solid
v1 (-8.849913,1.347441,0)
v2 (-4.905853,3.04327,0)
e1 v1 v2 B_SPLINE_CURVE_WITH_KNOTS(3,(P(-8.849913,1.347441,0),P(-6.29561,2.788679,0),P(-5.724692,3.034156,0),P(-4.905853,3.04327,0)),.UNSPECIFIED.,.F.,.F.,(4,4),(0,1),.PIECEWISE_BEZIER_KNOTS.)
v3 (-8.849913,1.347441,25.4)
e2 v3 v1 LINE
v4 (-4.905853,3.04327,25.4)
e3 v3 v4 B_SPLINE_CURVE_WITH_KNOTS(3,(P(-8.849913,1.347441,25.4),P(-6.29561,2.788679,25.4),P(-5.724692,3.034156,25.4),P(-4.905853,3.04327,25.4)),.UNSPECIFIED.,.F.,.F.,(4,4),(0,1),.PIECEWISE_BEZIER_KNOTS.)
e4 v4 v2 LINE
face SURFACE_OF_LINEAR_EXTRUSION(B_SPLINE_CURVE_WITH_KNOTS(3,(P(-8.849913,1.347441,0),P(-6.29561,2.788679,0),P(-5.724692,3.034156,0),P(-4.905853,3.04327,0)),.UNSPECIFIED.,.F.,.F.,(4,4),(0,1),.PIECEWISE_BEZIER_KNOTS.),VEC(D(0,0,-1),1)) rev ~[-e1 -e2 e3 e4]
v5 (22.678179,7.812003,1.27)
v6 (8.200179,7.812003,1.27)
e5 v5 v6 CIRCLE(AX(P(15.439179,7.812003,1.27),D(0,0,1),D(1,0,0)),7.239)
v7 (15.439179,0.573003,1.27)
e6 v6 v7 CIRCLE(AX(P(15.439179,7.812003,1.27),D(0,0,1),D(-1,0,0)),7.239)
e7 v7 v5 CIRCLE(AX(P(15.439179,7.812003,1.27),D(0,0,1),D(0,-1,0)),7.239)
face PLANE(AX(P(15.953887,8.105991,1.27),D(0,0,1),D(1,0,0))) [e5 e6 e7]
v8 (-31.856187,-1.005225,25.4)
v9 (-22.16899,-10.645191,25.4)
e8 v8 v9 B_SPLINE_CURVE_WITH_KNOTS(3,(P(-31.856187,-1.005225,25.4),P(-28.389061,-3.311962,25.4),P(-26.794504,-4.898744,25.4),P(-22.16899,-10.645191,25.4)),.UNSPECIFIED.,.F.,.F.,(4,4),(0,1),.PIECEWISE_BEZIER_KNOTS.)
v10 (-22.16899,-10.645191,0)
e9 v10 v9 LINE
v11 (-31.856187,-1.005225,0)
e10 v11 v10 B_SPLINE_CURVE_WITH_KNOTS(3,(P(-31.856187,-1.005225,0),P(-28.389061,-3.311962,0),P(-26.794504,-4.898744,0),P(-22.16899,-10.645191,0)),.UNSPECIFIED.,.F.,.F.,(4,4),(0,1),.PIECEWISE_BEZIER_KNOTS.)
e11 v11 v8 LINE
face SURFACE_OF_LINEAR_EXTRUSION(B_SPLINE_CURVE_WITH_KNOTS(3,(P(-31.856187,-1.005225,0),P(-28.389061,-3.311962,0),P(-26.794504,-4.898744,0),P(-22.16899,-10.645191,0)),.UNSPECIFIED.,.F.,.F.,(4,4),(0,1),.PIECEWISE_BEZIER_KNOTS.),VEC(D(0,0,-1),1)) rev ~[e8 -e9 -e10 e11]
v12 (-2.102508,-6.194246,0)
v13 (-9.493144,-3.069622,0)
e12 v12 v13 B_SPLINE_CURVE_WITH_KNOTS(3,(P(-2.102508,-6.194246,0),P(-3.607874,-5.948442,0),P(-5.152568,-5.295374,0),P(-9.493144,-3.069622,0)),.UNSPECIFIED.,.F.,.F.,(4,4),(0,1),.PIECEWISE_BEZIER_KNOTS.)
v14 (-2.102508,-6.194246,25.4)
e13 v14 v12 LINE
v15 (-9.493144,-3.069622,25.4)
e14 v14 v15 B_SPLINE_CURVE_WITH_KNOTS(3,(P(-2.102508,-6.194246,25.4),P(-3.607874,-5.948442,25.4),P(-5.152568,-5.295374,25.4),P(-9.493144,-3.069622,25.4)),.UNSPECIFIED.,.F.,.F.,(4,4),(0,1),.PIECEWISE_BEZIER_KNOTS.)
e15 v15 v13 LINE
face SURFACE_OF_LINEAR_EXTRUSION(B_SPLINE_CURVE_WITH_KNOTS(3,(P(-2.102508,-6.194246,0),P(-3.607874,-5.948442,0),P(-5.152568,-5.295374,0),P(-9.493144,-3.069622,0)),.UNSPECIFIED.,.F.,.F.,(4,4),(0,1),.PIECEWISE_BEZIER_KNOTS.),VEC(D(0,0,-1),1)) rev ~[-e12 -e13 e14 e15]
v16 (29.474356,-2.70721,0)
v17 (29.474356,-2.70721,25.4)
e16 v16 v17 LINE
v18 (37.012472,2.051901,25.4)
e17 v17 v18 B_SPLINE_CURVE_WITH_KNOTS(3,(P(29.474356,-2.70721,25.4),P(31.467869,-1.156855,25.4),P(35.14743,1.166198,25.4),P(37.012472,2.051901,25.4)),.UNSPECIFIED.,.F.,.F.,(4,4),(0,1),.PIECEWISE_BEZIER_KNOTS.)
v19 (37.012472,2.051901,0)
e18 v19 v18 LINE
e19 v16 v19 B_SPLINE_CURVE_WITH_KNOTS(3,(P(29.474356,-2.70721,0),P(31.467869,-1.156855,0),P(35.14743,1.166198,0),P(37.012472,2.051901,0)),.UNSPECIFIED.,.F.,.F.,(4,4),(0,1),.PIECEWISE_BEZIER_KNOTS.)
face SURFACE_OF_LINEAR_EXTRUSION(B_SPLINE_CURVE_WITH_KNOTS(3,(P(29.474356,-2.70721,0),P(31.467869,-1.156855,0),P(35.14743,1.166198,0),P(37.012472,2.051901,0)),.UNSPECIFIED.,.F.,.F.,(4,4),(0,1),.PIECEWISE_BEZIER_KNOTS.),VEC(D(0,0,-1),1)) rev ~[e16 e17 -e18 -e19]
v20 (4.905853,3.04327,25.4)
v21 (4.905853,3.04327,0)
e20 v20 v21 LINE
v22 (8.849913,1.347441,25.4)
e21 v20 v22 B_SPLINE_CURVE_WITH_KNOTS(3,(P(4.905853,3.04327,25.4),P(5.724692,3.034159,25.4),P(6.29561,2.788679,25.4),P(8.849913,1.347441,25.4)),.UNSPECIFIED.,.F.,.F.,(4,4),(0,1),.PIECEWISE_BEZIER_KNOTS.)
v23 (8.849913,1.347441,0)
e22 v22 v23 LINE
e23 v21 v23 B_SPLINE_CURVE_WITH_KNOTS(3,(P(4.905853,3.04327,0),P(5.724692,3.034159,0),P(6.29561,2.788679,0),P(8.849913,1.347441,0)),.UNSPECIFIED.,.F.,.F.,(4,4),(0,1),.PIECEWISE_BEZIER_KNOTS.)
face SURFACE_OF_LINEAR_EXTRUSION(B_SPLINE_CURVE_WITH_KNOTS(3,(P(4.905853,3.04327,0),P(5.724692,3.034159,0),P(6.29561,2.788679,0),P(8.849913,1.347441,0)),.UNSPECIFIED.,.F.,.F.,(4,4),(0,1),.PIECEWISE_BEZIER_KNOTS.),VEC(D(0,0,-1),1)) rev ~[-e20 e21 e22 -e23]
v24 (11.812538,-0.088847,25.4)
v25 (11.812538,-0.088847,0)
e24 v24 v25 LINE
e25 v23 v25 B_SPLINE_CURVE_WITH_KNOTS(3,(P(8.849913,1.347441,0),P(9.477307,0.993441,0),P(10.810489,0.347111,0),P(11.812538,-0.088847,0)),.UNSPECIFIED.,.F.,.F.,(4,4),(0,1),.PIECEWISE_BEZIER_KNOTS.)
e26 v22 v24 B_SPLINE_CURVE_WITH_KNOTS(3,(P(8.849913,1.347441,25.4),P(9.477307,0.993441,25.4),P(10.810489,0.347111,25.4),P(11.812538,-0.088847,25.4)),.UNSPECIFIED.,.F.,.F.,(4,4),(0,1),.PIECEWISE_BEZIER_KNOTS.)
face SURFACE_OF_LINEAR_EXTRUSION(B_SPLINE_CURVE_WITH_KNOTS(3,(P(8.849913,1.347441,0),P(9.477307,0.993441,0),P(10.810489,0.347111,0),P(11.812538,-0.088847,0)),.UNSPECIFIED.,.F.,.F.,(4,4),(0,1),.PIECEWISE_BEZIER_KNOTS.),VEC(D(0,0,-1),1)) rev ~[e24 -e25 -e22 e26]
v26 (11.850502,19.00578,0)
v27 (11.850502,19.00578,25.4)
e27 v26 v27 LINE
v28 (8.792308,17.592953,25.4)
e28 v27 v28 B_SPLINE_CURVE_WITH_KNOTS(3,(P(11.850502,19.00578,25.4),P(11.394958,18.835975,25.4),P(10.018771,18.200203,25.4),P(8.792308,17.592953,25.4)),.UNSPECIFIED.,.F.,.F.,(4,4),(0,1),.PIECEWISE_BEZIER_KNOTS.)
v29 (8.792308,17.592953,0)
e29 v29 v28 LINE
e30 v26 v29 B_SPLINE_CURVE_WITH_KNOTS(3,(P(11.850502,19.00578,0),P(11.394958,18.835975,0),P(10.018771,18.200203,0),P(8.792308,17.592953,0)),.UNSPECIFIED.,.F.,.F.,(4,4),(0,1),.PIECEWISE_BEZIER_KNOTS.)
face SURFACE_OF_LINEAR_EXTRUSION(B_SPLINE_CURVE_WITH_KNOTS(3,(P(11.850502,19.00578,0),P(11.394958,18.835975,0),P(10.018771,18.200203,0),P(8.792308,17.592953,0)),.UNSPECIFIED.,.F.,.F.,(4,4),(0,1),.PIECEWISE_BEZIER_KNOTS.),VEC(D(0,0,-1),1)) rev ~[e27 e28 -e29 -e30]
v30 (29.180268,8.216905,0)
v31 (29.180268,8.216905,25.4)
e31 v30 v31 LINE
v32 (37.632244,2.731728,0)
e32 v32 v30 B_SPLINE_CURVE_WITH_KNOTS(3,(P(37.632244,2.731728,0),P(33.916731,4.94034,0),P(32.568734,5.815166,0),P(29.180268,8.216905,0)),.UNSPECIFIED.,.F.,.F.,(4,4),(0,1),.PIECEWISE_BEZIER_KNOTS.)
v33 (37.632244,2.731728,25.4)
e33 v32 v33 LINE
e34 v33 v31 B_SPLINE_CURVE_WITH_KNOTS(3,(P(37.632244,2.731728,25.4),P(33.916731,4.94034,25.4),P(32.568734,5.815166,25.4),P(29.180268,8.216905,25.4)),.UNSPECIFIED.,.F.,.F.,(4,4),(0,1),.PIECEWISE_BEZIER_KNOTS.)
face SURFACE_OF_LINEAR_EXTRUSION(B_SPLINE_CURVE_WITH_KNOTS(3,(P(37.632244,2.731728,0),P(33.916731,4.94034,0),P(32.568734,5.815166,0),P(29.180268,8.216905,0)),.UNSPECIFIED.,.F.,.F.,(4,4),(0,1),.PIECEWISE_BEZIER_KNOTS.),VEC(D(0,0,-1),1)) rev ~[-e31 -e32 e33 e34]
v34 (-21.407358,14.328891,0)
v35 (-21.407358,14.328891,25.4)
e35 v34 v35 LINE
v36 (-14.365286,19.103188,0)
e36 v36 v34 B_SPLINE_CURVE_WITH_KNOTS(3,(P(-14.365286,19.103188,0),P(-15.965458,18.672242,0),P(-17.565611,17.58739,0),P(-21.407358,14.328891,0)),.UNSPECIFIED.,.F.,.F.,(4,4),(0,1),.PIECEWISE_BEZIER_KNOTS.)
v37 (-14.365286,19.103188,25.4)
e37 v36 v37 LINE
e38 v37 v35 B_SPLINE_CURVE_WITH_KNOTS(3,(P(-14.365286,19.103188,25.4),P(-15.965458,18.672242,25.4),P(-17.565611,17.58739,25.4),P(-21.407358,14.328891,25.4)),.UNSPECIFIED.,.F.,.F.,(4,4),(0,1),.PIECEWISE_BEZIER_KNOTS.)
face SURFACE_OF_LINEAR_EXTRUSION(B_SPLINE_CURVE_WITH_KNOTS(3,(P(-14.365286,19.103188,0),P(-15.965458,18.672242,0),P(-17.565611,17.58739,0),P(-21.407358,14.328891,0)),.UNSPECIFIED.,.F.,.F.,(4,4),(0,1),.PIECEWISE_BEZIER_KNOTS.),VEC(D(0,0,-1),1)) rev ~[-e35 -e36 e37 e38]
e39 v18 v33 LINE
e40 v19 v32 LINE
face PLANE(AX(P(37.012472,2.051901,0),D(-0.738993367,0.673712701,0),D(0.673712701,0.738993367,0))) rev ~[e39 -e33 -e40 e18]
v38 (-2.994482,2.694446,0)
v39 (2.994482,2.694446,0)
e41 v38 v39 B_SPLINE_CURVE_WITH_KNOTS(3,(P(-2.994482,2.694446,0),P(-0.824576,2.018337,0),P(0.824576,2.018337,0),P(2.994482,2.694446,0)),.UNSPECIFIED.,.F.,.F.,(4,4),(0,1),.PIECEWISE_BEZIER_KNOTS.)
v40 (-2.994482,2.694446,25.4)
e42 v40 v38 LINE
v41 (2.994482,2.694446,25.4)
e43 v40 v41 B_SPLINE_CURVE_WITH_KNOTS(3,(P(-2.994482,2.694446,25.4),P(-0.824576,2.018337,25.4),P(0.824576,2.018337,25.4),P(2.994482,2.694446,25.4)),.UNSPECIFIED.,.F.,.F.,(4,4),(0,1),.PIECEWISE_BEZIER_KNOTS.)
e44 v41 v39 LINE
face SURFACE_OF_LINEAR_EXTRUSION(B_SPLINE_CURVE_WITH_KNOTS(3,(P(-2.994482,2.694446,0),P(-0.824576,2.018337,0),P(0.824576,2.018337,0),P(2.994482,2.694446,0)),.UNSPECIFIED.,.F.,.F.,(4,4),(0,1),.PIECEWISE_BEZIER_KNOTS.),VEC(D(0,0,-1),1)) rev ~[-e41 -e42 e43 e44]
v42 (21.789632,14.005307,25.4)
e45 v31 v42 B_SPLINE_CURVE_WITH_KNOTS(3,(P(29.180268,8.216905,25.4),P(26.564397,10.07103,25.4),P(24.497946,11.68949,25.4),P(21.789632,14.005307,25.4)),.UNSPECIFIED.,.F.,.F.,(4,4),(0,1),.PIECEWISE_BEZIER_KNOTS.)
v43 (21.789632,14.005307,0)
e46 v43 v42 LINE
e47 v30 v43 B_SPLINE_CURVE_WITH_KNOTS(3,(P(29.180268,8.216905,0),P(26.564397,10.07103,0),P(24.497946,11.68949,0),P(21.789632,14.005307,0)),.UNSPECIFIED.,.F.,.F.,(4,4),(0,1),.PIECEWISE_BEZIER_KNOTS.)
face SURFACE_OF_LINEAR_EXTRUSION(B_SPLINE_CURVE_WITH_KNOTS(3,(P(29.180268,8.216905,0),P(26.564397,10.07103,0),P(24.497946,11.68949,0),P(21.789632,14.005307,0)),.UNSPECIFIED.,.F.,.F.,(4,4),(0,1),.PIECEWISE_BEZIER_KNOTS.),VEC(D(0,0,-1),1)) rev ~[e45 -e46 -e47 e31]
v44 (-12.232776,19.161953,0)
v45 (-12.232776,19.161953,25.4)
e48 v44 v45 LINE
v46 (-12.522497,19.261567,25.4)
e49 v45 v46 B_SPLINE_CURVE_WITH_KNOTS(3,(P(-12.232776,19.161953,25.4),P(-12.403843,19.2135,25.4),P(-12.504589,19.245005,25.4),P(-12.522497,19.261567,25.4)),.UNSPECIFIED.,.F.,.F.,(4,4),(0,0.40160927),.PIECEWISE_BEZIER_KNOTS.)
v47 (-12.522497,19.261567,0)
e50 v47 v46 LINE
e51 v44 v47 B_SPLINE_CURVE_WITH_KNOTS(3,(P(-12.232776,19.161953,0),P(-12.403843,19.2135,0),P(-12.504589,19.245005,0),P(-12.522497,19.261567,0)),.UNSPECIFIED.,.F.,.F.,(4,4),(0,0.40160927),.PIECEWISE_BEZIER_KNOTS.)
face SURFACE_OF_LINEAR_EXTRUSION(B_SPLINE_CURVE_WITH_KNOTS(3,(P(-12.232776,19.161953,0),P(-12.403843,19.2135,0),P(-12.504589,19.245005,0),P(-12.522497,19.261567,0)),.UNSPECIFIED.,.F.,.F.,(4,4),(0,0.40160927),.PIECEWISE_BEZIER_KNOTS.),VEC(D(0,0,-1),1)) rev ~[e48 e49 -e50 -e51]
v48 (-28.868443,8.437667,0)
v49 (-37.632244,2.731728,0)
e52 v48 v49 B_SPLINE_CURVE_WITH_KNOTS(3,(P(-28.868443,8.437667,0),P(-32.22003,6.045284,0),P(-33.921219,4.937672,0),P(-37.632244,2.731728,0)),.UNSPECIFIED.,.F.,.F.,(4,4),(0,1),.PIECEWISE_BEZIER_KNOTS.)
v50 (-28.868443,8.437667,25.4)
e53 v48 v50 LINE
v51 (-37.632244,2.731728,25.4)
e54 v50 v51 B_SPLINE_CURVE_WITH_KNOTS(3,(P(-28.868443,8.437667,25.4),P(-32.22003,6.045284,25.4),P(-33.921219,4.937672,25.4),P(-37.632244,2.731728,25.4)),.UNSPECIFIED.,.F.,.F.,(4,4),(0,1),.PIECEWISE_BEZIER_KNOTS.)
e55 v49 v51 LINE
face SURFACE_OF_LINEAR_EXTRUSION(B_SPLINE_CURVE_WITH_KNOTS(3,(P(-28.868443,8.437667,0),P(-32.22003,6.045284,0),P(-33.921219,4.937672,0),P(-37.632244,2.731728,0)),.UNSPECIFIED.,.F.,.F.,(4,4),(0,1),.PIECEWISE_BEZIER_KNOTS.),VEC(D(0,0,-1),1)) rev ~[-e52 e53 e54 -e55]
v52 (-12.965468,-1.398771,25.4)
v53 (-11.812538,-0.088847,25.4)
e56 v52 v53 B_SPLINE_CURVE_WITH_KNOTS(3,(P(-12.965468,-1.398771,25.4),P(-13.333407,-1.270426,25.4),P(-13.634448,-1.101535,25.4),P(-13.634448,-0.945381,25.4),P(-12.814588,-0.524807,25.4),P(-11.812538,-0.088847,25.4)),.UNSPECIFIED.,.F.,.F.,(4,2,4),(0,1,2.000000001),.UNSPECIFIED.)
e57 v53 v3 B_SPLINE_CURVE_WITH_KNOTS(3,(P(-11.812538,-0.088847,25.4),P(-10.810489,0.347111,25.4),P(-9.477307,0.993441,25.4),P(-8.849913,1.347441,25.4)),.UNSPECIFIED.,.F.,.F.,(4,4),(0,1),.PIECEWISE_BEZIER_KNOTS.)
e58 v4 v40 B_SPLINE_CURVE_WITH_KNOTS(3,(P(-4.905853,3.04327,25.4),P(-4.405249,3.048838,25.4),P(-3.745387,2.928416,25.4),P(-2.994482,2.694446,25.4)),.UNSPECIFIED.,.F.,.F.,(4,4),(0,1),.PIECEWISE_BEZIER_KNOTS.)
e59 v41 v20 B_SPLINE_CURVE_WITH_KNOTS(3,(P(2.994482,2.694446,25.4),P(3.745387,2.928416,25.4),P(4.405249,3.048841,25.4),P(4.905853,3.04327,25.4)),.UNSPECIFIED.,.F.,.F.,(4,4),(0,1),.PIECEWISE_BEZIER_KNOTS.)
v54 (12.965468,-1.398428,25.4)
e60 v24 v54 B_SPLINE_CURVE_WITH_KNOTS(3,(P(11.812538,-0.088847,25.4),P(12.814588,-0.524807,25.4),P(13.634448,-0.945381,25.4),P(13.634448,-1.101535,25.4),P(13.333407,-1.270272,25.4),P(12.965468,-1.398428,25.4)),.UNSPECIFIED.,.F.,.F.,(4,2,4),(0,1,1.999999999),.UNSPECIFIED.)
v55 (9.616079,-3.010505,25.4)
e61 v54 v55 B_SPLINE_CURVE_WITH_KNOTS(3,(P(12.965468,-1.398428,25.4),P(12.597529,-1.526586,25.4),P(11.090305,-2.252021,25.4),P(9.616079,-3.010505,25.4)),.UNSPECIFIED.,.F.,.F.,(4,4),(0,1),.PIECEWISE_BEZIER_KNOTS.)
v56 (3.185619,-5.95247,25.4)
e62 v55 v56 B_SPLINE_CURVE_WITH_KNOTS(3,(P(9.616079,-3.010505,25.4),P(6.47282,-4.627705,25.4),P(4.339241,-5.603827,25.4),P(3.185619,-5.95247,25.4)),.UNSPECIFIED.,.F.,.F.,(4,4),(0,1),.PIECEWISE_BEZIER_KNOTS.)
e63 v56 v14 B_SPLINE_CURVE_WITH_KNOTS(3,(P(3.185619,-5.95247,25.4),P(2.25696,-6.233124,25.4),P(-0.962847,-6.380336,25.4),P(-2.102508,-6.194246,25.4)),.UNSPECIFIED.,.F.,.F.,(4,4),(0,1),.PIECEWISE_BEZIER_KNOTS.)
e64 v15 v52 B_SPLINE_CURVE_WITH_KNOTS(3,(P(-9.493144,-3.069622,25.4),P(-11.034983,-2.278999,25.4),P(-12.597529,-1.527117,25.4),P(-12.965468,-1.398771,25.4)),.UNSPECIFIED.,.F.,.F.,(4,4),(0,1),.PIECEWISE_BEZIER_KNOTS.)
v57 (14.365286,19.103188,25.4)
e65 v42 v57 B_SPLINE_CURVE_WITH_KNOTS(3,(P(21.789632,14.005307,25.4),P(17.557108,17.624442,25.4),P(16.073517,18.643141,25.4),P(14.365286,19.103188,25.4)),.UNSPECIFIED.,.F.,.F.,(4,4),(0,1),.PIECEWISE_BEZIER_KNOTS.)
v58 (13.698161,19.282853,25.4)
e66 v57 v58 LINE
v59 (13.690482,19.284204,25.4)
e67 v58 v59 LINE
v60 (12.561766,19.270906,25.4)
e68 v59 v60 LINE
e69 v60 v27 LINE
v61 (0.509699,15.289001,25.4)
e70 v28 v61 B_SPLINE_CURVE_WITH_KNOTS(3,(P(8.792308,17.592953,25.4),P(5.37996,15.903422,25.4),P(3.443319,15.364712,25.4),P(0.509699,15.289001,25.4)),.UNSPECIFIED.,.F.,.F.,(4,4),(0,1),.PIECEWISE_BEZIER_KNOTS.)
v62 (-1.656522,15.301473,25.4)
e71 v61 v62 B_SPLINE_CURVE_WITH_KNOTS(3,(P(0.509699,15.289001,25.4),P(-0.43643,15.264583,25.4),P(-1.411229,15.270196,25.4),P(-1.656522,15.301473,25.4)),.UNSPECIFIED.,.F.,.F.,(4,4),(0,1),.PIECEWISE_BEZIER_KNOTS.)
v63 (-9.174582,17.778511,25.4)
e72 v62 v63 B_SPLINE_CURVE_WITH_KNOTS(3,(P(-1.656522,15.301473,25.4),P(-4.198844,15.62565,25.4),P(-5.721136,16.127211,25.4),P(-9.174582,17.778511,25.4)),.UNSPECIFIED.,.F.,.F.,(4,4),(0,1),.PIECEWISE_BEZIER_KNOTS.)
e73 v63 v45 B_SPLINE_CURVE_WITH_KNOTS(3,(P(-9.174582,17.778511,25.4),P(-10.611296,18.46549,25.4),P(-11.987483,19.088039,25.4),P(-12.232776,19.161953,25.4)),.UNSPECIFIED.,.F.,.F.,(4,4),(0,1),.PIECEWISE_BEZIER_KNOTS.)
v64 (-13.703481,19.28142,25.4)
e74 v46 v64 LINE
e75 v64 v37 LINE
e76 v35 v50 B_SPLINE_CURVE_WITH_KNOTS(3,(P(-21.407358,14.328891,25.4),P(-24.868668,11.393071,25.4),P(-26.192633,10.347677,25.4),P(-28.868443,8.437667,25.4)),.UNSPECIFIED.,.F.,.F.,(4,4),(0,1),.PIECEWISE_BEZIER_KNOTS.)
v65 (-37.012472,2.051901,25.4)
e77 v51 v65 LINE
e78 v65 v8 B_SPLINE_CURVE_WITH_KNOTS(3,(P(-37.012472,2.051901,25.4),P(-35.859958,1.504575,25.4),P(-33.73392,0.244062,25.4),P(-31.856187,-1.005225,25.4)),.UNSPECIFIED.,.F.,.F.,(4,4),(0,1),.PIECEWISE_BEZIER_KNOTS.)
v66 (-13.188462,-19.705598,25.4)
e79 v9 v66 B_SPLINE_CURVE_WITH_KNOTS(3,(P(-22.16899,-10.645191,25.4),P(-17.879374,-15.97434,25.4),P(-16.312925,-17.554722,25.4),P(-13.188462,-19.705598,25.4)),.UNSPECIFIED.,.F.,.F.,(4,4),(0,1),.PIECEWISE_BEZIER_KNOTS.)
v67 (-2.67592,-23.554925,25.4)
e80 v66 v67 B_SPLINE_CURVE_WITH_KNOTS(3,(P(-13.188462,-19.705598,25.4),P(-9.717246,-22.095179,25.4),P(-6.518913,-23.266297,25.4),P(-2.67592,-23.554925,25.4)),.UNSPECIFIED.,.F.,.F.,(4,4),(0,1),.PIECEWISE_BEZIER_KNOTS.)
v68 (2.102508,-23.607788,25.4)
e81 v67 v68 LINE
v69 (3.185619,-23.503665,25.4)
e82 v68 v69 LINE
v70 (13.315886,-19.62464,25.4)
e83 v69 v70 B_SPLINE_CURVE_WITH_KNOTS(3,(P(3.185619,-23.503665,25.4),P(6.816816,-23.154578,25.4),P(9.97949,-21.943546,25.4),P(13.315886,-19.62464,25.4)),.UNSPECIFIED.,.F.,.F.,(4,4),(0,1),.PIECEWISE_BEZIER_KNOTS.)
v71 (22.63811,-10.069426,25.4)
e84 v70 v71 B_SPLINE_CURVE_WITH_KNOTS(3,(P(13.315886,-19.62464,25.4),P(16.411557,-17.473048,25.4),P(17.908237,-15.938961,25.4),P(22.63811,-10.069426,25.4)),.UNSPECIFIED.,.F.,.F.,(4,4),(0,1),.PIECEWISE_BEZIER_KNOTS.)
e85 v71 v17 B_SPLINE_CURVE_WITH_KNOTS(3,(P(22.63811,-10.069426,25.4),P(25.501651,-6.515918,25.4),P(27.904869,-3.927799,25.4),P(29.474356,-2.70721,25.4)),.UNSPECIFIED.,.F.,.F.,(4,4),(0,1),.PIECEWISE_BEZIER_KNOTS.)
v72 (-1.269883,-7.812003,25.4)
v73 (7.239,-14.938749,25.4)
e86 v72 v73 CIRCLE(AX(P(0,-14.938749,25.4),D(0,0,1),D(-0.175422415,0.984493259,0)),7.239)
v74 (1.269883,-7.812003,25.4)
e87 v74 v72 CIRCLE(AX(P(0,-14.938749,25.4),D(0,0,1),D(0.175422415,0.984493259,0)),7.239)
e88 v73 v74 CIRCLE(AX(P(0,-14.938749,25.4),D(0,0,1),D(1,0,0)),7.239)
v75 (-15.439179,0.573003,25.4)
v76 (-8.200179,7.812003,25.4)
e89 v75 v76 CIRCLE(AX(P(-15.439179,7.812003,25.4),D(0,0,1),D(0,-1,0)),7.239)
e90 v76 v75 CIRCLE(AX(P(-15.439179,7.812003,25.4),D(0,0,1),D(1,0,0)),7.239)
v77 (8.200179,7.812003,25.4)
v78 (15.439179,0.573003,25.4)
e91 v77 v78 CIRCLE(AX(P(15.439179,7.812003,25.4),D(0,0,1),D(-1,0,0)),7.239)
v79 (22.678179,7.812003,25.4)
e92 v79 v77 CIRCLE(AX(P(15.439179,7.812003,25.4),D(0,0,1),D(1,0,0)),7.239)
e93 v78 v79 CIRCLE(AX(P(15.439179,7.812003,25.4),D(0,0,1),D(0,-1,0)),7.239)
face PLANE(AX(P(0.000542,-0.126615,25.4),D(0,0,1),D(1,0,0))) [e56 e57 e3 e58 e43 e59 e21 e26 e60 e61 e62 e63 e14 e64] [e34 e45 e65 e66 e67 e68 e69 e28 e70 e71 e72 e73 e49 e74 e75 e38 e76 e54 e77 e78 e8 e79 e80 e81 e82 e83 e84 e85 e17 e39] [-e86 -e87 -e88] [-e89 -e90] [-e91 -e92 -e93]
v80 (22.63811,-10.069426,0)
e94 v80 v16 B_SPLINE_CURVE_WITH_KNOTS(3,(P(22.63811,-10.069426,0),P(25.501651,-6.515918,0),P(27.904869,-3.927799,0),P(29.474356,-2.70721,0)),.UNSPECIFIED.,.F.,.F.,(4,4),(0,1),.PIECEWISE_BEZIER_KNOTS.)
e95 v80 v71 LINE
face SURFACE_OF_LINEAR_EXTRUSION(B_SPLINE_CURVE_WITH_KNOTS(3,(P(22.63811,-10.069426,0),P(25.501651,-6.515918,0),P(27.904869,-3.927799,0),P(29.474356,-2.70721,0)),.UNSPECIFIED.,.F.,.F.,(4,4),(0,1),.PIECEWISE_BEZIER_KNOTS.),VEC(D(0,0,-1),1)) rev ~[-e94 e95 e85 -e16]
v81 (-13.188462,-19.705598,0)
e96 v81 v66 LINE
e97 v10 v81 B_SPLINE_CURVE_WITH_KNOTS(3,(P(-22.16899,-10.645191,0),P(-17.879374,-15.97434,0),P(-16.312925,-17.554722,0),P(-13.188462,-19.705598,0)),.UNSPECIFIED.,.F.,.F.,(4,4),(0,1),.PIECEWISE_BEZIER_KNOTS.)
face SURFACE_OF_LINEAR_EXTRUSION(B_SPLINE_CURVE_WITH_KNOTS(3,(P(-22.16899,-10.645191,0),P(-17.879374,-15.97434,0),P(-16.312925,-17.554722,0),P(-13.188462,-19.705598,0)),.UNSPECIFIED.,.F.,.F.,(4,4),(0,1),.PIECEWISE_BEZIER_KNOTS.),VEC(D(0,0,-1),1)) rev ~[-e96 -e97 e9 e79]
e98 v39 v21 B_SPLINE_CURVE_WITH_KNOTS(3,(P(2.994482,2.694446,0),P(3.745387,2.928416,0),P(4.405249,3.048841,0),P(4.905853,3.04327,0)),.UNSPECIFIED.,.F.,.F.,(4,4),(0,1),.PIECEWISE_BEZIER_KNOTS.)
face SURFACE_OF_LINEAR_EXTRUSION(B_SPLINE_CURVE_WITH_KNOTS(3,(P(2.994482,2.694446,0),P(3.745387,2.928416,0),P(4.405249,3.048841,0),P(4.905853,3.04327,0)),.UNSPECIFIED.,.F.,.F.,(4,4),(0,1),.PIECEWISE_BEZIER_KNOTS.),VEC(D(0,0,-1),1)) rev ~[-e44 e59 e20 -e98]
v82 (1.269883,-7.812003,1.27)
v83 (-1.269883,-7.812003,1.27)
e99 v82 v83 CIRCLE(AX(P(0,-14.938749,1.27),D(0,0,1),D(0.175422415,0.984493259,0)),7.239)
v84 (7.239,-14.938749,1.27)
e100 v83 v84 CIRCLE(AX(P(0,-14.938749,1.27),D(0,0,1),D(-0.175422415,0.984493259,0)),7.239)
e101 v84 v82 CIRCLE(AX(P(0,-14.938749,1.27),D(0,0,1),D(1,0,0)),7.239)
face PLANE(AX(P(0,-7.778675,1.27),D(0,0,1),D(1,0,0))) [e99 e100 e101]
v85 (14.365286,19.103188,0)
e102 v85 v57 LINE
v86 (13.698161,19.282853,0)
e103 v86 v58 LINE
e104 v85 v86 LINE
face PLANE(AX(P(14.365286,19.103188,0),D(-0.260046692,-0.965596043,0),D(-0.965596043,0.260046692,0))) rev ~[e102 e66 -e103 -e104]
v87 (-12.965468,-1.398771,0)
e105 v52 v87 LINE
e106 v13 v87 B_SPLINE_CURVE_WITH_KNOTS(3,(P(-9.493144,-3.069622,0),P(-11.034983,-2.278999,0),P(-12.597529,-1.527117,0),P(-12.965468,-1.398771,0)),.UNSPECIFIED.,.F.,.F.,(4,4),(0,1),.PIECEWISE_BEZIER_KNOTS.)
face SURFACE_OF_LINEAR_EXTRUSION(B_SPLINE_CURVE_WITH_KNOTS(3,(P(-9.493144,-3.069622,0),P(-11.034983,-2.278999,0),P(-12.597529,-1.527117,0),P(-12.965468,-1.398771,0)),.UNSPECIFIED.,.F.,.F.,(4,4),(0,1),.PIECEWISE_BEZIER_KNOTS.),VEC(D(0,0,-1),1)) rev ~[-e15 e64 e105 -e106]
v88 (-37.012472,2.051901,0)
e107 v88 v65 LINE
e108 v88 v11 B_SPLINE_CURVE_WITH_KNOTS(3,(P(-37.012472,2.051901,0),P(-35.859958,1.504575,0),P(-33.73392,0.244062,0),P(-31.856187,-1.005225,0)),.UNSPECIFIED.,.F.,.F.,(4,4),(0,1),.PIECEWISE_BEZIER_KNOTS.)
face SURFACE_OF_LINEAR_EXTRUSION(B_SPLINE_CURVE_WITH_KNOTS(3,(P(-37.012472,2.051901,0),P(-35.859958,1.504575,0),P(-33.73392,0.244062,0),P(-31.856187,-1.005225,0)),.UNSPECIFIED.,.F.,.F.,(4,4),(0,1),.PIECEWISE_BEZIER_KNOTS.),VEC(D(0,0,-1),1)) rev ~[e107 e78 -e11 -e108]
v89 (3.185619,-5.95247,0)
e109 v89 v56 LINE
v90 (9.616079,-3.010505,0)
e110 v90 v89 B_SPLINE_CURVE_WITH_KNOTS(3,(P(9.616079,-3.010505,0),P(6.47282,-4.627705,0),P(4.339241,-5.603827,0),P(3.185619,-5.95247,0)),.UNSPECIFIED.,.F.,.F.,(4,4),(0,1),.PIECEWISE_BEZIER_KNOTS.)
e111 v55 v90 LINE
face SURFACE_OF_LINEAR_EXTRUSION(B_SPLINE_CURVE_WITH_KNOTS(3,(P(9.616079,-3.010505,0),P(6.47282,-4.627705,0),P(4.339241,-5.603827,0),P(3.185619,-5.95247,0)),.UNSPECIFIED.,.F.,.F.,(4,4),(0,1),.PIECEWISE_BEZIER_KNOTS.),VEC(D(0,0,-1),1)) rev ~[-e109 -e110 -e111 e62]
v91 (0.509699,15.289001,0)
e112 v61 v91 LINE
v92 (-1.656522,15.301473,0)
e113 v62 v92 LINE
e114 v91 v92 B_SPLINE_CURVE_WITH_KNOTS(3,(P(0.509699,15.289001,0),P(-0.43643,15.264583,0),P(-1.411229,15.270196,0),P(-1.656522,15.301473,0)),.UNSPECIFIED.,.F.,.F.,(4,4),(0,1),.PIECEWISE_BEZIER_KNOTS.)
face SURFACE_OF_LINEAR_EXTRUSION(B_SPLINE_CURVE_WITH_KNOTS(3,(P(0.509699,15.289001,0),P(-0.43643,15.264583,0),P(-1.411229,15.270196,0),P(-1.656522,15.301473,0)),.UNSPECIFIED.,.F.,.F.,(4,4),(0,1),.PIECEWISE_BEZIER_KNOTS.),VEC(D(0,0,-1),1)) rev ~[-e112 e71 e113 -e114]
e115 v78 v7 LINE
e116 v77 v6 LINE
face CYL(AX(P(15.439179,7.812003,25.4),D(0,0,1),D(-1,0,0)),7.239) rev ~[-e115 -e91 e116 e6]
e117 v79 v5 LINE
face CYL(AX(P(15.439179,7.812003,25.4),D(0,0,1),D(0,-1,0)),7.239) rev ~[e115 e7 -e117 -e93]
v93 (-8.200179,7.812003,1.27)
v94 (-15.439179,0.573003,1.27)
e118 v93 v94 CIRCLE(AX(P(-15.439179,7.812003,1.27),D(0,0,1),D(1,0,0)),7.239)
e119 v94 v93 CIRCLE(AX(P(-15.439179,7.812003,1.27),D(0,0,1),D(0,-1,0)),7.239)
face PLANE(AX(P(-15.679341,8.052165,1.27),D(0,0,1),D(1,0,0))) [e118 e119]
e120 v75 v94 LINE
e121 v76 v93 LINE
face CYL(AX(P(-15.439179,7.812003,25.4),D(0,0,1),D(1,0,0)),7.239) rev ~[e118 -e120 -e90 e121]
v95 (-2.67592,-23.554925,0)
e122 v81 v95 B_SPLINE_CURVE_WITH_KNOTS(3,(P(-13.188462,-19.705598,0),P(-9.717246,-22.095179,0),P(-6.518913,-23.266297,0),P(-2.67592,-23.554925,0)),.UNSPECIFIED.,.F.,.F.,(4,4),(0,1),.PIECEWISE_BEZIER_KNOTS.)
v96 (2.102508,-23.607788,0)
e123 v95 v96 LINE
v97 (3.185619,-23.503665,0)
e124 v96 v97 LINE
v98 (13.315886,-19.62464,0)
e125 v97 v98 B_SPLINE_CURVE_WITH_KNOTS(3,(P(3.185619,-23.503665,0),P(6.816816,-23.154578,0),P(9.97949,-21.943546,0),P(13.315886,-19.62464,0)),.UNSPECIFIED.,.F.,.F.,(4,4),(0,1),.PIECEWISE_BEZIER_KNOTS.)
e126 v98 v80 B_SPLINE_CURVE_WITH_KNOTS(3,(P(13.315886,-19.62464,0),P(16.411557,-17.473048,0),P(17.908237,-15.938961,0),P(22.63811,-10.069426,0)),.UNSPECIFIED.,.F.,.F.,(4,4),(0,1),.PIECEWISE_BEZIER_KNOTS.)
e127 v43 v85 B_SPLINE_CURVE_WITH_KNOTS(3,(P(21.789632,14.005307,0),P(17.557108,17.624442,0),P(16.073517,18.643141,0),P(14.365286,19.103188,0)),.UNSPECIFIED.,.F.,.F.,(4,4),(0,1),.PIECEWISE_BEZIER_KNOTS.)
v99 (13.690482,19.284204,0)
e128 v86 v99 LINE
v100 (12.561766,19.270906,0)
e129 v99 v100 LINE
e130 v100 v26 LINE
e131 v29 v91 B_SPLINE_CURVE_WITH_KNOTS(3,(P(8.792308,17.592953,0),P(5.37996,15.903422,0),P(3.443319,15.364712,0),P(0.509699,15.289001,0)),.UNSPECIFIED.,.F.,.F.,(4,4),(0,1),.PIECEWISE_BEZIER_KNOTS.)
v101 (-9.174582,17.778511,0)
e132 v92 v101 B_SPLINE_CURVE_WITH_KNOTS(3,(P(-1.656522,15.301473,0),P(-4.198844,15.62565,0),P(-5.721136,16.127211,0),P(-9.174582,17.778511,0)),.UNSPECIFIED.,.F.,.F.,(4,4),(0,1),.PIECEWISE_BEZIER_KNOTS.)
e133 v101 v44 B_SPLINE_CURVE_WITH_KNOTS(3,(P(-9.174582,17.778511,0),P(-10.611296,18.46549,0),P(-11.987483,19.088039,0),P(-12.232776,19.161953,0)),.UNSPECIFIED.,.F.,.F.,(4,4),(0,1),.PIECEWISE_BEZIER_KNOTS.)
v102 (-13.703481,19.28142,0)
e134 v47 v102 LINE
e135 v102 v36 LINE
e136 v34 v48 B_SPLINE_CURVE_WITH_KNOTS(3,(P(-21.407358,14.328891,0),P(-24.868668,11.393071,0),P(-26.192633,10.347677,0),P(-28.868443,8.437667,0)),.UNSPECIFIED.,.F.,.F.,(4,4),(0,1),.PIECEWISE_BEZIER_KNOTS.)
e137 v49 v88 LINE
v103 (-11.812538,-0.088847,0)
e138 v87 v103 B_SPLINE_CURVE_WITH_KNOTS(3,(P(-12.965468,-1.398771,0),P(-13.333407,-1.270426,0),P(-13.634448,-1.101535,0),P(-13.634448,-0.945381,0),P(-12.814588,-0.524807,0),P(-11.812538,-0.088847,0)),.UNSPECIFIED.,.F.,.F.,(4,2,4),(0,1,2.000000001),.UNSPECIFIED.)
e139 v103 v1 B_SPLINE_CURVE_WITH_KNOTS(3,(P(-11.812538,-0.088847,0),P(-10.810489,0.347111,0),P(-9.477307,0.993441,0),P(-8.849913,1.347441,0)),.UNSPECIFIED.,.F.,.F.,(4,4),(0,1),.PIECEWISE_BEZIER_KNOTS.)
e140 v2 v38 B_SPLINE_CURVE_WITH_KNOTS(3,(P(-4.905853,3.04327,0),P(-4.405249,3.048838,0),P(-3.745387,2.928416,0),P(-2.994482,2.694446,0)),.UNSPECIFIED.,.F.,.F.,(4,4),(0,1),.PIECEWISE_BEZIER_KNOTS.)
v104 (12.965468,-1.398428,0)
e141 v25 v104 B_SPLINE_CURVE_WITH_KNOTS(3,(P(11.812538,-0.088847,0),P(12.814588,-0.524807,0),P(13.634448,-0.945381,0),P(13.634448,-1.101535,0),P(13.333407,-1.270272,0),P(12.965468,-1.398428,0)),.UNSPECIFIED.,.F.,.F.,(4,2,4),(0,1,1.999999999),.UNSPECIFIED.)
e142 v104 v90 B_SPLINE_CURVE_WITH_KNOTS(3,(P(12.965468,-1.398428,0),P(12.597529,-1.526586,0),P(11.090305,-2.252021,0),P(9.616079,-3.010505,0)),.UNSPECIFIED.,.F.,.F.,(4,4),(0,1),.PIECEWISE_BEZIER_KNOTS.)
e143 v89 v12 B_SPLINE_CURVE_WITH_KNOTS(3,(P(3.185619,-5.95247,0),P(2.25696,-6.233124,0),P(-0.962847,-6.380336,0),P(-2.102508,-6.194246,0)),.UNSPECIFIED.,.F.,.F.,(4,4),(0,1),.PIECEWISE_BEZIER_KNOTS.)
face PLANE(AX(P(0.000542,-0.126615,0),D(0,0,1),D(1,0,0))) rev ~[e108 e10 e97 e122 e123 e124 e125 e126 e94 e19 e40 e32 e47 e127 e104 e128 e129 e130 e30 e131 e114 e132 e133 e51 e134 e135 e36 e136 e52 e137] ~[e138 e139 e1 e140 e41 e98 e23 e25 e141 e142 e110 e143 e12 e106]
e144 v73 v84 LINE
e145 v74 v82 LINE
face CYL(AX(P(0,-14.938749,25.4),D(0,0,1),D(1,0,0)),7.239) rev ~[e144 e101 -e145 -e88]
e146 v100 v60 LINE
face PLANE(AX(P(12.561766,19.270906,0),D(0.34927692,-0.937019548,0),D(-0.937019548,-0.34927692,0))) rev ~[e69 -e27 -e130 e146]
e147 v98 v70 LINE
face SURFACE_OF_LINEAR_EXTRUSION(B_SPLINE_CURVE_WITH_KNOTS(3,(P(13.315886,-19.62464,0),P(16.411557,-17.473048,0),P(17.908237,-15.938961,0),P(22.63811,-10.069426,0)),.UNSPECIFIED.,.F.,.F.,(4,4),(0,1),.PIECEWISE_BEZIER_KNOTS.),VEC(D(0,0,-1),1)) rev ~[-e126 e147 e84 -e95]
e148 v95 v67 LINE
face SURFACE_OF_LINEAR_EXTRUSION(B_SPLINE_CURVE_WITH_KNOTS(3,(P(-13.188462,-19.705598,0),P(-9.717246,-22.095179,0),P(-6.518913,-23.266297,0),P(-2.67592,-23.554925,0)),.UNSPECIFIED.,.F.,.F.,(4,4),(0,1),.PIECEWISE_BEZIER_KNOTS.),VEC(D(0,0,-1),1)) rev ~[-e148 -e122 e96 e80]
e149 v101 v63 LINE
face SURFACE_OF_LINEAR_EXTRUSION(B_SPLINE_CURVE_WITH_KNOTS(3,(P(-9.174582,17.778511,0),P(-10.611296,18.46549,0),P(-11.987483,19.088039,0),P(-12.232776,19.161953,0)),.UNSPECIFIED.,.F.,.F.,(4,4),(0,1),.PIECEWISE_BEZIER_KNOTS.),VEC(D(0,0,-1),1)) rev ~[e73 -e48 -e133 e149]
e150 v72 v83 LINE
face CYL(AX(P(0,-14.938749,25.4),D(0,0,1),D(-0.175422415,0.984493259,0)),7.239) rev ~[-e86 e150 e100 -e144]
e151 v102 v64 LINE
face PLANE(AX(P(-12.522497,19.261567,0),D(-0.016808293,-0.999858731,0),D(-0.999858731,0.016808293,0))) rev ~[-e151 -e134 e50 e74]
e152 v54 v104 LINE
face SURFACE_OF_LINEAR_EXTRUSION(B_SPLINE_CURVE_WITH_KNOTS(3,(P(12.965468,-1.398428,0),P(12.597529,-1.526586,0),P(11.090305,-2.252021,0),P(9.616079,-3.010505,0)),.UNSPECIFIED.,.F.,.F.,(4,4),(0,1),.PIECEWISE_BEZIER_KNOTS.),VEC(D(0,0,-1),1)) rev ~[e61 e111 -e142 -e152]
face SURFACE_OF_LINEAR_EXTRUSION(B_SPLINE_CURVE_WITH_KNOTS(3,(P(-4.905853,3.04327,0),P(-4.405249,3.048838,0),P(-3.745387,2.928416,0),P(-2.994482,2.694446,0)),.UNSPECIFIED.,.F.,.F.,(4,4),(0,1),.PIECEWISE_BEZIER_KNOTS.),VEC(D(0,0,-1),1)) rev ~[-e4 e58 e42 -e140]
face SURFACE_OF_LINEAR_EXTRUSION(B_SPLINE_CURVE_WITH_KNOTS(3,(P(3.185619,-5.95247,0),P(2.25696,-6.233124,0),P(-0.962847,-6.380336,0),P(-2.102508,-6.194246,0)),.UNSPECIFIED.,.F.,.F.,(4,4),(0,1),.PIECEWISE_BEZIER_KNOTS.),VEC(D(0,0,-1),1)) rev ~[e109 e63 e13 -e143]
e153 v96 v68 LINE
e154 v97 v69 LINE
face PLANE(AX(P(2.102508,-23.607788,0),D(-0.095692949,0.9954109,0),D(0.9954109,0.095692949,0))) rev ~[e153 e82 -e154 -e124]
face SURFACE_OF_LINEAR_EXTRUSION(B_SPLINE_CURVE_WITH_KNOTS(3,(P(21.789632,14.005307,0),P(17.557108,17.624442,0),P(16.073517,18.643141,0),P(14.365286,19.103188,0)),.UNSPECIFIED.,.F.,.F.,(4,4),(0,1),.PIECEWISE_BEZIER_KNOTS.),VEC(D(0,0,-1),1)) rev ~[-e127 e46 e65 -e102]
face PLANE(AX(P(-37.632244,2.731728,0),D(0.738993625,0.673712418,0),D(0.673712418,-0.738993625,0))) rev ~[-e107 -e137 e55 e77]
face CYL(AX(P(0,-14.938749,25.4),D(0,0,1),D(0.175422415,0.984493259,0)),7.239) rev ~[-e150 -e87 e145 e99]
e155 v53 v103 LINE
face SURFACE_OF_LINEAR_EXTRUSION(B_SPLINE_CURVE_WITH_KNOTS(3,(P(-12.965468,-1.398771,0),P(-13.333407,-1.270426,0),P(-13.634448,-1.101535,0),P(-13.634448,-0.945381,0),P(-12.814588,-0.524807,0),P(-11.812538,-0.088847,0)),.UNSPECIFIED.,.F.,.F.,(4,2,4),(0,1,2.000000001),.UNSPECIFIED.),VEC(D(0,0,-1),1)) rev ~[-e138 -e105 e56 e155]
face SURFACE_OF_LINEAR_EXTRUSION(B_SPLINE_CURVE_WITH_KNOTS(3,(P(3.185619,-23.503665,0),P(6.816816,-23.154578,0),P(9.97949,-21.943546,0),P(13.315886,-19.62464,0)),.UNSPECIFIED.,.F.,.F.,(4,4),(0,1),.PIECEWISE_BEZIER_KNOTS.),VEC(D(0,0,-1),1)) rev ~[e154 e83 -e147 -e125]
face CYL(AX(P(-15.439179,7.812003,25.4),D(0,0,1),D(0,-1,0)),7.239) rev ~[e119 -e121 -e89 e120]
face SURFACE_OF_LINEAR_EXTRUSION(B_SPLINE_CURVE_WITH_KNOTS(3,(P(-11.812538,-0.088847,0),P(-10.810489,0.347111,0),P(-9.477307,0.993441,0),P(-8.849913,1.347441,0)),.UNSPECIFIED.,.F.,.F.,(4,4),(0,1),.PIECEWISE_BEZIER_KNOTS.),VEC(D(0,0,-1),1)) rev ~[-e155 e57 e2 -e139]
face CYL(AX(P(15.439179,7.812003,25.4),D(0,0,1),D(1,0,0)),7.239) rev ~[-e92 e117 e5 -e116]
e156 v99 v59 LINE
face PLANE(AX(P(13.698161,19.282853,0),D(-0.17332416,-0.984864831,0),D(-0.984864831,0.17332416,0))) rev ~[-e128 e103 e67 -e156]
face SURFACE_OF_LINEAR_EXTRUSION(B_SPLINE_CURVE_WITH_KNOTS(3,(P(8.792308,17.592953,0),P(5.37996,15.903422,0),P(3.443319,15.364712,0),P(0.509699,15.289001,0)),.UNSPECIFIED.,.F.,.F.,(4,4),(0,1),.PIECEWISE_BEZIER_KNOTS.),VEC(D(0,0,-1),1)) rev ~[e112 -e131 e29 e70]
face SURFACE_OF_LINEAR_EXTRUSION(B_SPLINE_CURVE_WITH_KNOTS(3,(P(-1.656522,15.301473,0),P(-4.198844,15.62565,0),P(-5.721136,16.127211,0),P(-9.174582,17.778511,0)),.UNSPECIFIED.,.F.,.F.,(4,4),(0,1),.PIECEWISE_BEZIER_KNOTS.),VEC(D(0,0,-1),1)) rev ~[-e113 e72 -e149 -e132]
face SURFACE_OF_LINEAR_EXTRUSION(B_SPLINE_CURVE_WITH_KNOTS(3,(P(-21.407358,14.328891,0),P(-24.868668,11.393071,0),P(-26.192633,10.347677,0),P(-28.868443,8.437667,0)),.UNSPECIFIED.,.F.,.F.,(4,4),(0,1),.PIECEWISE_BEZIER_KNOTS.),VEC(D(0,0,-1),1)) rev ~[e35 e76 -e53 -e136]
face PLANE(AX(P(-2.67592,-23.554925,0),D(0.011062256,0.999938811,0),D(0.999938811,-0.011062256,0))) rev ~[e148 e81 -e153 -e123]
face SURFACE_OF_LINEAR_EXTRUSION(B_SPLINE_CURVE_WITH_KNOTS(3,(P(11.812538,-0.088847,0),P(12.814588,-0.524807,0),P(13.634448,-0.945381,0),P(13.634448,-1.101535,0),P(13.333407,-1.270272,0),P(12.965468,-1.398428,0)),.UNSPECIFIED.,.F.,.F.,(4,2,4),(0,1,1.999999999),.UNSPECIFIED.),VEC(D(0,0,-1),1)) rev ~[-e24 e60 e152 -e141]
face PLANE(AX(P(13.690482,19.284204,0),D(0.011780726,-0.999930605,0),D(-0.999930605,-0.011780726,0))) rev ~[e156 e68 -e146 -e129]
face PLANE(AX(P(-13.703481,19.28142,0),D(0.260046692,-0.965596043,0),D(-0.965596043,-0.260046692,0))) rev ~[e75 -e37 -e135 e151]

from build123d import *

# Parameters (mm, degrees)
F1_DEPTH = 25.4
F2_R     = 7.239
F3_DEPTH = 24.13


# Not quite as in the source:
# - ends of sketch curves that miss each other by under 0.0002 mm in the source are joined


with BuildPart() as f1:
    # F0 (on Top) → F1 (new body)
    with BuildSketch(Plane.XY):
        with BuildLine():
            add(Edge.make_bspline(
                [(-13.1884615385, -19.7055979293), (-9.7172457191, -22.0951789594), (-6.5189125485, -23.2662965046), (-2.6759197324, -23.5549250296)],
                knots=[0, 0, 0, 0, 1, 1, 1, 1], degree=3))
            Line((-2.6759197324, -23.5549250296), (2.1025083612, -23.6077884611))
            Line((2.1025083612, -23.6077884611), (3.1856187291, -23.5036646015))
            add(Edge.make_bspline(
                [(3.1856187291, -23.5036646015), (6.8168163211, -23.15457813), (9.9794896756, -21.9435460564), (13.3158862876, -19.6246398892)],
                knots=[0, 0, 0, 0, 1, 1, 1, 1], degree=3))
            add(Edge.make_bspline(
                [(13.3158862876, -19.6246398892), (16.4115571605, -17.4730475146), (17.9082372943, -15.9389605714), (22.6381101873, -10.0694262069)],
                knots=[0, 0, 0, 0, 1, 1, 1, 1], degree=3))
            add(Edge.make_bspline(
                [(22.6381101873, -10.0694262069), (25.5016513946, -6.5159182102), (27.9048694214, -3.927799227), (29.4743562341, -2.7072102972)],
                knots=[0, 0, 0, 0, 1, 1, 1, 1], degree=3))
            add(Edge.make_bspline(
                [(29.4743562341, -2.7072102972), (31.4678692876, -1.1568550363), (35.1474296689, 1.1661975322), (37.0124718161, 2.0519014787)],
                knots=[0, 0, 0, 0, 1, 1, 1, 1], degree=3))
            Line((37.0124718161, 2.0519014787), (37.6322441338, 2.7317278065))
            add(Edge.make_bspline(
                [(37.6322441338, 2.7317278065), (33.9167308595, 4.9403402078), (32.5687337458, 5.8151659035), (29.1802675585, 8.2169048474)],
                knots=[0, 0, 0, 0, 1, 1, 1, 1], degree=3))
            add(Edge.make_bspline(
                [(29.1802675585, 8.2169048474), (26.5643967391, 10.0710303571), (24.4979457592, 11.6894900051), (21.789632107, 14.0053073964)],
                knots=[0, 0, 0, 0, 1, 1, 1, 1], degree=3))
            add(Edge.make_bspline(
                [(21.789632107, 14.0053073964), (17.557108204, 17.6244421652), (16.0735171405, 18.6431407559), (14.3652864381, 19.1031879026)],
                knots=[0, 0, 0, 0, 1, 1, 1, 1], degree=3))
            Line((14.3652864381, 19.1031879026), (13.6981605351, 19.2828529762))
            Line((13.6981605351, 19.2828529762), (13.6904819746, 19.2842043089))
            Line((13.6904819746, 19.2842043089), (12.5617656785, 19.2709062892))
            Line((12.5617656785, 19.2709062892), (11.8505016722, 19.0057804423))
            add(Edge.make_bspline(
                [(11.8505016722, 19.0057804423), (11.394958194, 18.8359751773), (10.018770903, 18.2002029302), (8.7923076923, 17.5929531204)],
                knots=[0, 0, 0, 0, 1, 1, 1, 1], degree=3))
            add(Edge.make_bspline(
                [(8.7923076923, 17.5929531204), (5.3799595585, 15.9034224779), (3.4433187191, 15.3647120515), (0.5096989967, 15.2890007254)],
                knots=[0, 0, 0, 0, 1, 1, 1, 1], degree=3))
            add(Edge.make_bspline(
                [(0.5096989967, 15.2890007254), (-0.4364297659, 15.2645829578), (-1.411229097, 15.2701955402), (-1.6565217391, 15.3014730598)],
                knots=[0, 0, 0, 0, 1, 1, 1, 1], degree=3))
            add(Edge.make_bspline(
                [(-1.6565217391, 15.3014730598), (-4.1988442676, 15.625649745), (-5.7211355017, 16.1272113972), (-9.1745819398, 17.7785107923)],
                knots=[0, 0, 0, 0, 1, 1, 1, 1], degree=3))
            add(Edge.make_bspline(
                [(-9.1745819398, 17.7785107923), (-10.6112959866, 18.4654896305), (-11.9874832776, 19.0880385335), (-12.2327759197, 19.1619526928)],
                knots=[0, 0, 0, 0, 1, 1, 1, 1], degree=3))
            add(Edge.make_bspline(
                [(-12.2327759197, 19.1619526928), (-12.4038425542, 19.2135003349), (-12.5045889513, 19.2450051824), (-12.5224971626, 19.2615668616)],
                knots=[0, 0, 0, 0, 0.4016092701, 0.4016092701, 0.4016092701, 0.4016092701], degree=3))
            Line((-12.5224971626, 19.2615668616), (-13.7034814285, 19.2814199953))
            Line((-13.7034814285, 19.2814199953), (-14.3652864381, 19.1031879026))
            add(Edge.make_bspline(
                [(-14.3652864381, 19.1031879026), (-15.9654584047, 18.6722420201), (-17.5656112575, 17.5873902337), (-21.4073578595, 14.3288910786)],
                knots=[0, 0, 0, 0, 1, 1, 1, 1], degree=3))
            add(Edge.make_bspline(
                [(-21.4073578595, 14.3288910786), (-24.8686676789, 11.3930710494), (-26.1926326442, 10.347677133), (-28.8684434285, 8.4376666326)],
                knots=[0, 0, 0, 0, 1, 1, 1, 1], degree=3))
            add(Edge.make_bspline(
                [(-28.8684434285, 8.4376666326), (-32.2200301856, 6.0452835322), (-33.9212185999, 4.9376719336), (-37.6322438152, 2.7317278065)],
                knots=[0, 0, 0, 0, 1, 1, 1, 1], degree=3))
            Line((-37.6322438152, 2.7317278065), (-37.0124719753, 2.0519014787))
            add(Edge.make_bspline(
                [(-37.0124719753, 2.0519014787), (-35.8599579657, 1.5045752279), (-33.7339199875, 0.2440615757), (-31.856187291, -1.0052246818)],
                knots=[0, 0, 0, 0, 1, 1, 1, 1], degree=3))
            add(Edge.make_bspline(
                [(-31.856187291, -1.0052246818), (-28.3890610096, -3.3119617855), (-26.7945040146, -4.8987439594), (-22.168989602, -10.6451911133)],
                knots=[0, 0, 0, 0, 1, 1, 1, 1], degree=3))
            add(Edge.make_bspline(
                [(-22.168989602, -10.6451911133), (-17.8793743144, -15.9743400531), (-16.3129253077, -17.5547216818), (-13.1884615385, -19.7055979293)],
                knots=[0, 0, 0, 0, 1, 1, 1, 1], degree=3))
        make_face()
        with BuildLine():
            add(Edge.make_bspline(
                [(3.1856187291, -5.9524701801), (2.2569598997, -6.2331244644), (-0.9628468896, -6.3803357286), (-2.1025083612, -6.1942458992)],
                knots=[0, 0, 0, 0, 1, 1, 1, 1], degree=3))
            add(Edge.make_bspline(
                [(-2.1025083612, -6.1942458992), (-3.6078737659, -5.9484422838), (-5.1525675452, -5.2953738791), (-9.4931438127, -3.0696215748)],
                knots=[0, 0, 0, 0, 1, 1, 1, 1], degree=3))
            add(Edge.make_bspline(
                [(-9.4931438127, -3.0696215748), (-11.0349832776, -2.2789994276), (-12.5975292642, -1.5271169527), (-12.9654682274, -1.3987709226)],
                knots=[0, 0, 0, 0, 1, 1, 1, 1], degree=3))
            add(Edge.make_bspline(
                [(-12.9654682274, -1.3987709226), (-13.3334071906, -1.2704261668), (-13.6344481605, -1.1015348557), (-13.6344481605, -1.0234578892)],
                knots=[0, 0, 0, 0, 1, 1, 1, 1], degree=3))
            add(Edge.make_bspline(
                [(-13.6344481605, -1.0234578892), (-13.6344481605, -0.9453809226), (-12.8145884047, -0.5248066183), (-11.8125380167, -0.0888470497)],
                knots=[0, 0, 0, 0, 1, 1, 1, 1], degree=3))
            add(Edge.make_bspline(
                [(-11.8125380167, -0.0888470497), (-10.810488903, 0.3471112446), (-9.4773074649, 0.9934414286), (-8.8499125987, 1.3474413985)],
                knots=[0, 0, 0, 0, 1, 1, 1, 1], degree=3))
            add(Edge.make_bspline(
                [(-8.8499125987, 1.3474413985), (-6.2956095953, 2.7886790239), (-5.7246919264, 3.0341564319), (-4.9058528428, 3.04326985)],
                knots=[0, 0, 0, 0, 1, 1, 1, 1], degree=3))
            add(Edge.make_bspline(
                [(-4.9058528428, 3.04326985), (-4.4052494247, 3.0488383115), (-3.7453867324, 2.9284155523), (-2.9944816054, 2.6944458734)],
                knots=[0, 0, 0, 0, 1, 1, 1, 1], degree=3))
            add(Edge.make_bspline(
                [(-2.9944816054, 2.6944458734), (-0.8245757458, 2.0183365255), (0.8245757458, 2.0183365255), (2.9944816054, 2.6944458734)],
                knots=[0, 0, 0, 0, 1, 1, 1, 1], degree=3))
            add(Edge.make_bspline(
                [(2.9944816054, 2.6944458734), (3.7453867324, 2.9284155523), (4.4052494247, 3.04884086), (4.9058528428, 3.04326985)],
                knots=[0, 0, 0, 0, 1, 1, 1, 1], degree=3))
            add(Edge.make_bspline(
                [(4.9058528428, 3.04326985), (5.7246919264, 3.0341589804), (6.2956095953, 2.7886790239), (8.8499125987, 1.3474413985)],
                knots=[0, 0, 0, 0, 1, 1, 1, 1], degree=3))
            add(Edge.make_bspline(
                [(8.8499125987, 1.3474413985), (9.4773074649, 0.9934414286), (10.810488903, 0.3471112446), (11.8125380167, -0.0888470497)],
                knots=[0, 0, 0, 0, 1, 1, 1, 1], degree=3))
            add(Edge.make_bspline(
                [(11.8125380167, -0.0888470497), (12.8145884047, -0.5248066183), (13.6344481605, -0.9453809226), (13.6344481605, -1.0234578892)],
                knots=[0, 0, 0, 0, 1, 1, 1, 1], degree=3))
            add(Edge.make_bspline(
                [(13.6344481605, -1.0234578892), (13.6344481605, -1.1015348557), (13.3334071906, -1.2702719828), (12.9654682274, -1.39842815)],
                knots=[0, 0, 0, 0, 1, 1, 1, 1], degree=3))
            add(Edge.make_bspline(
                [(12.9654682274, -1.39842815), (12.5975292642, -1.5265855915), (11.0903047324, -2.2520210597), (9.616079388, -3.0105054109)],
                knots=[0, 0, 0, 0, 1, 1, 1, 1], degree=3))
            add(Edge.make_bspline(
                [(9.616079388, -3.0105054109), (6.4728204682, -4.6277051467), (4.3392408562, -5.6038271467), (3.1856187291, -5.9524701801)],
                knots=[0, 0, 0, 0, 1, 1, 1, 1], degree=3))
        make_face(mode=Mode.SUBTRACT)
    extrude(amount=F1_DEPTH)

    # F2 (on face) → F3 (cut)
    with BuildSketch(Plane.XY.offset(25.4)):
        with BuildLine():
            Line((-15.4391787946, 0.5730026737), (-15.4391787946, 7.8120026737))
            Line((-15.4391787946, 7.8120026737), (-8.2001787946, 7.8120026737))
            ThreePointArc((-8.2001787946, 7.8120026737), (-20.5579247836, 12.9307486628), (-15.4391787946, 0.5730026737))
        make_face()
        with BuildLine():
            Line((-8.2001787946, 7.8120026737), (-15.4391787946, 7.8120026737))
            Line((-15.4391787946, 7.8120026737), (-15.4391787946, 0.5730026737))
            ThreePointArc((-15.4391787946, 0.5730026737), (-10.3204328056, 2.6932566847), (-8.2001787946, 7.8120026737))
        make_face()
        with BuildLine():
            ThreePointArc((5.2293543768, 16.0678049121), (0.0138821984, 18.3010974633), (-5.2101171545, 16.0878246774))
            add(Edge.make_bspline(
                [(-1.6565217391, 15.3014730598), (-2.9785522156, 15.4700478385), (-4.0247567323, 15.686589164), (-5.2101171545, 16.0878246774)],
                knots=[0, 0, 0, 0, 0.5200089531, 0.5200089531, 0.5200089531, 0.5200089531], degree=3))
            add(Edge.make_bspline(
                [(0.5096989967, 15.2890007254), (-0.4364297659, 15.2645829578), (-1.411229097, 15.2701955402), (-1.6565217391, 15.3014730598)],
                knots=[0, 0, 0, 0, 1, 1, 1, 1], degree=3))
            add(Edge.make_bspline(
                [(5.2293543768, 16.0678049121), (3.6603216323, 15.5449011909), (2.2630856254, 15.3342524074), (0.5096989967, 15.2890007254)],
                knots=[0.4023129122, 0.4023129122, 0.4023129122, 0.4023129122, 1, 1, 1, 1], degree=3))
        make_face()
        with BuildLine():
            add(Edge.make_bspline(
                [(-13.4162854763, -0.8613894905), (-13.1075898138, -0.6826431402), (-12.5033600683, -0.3894012805), (-11.8125380167, -0.0888470497)],
                knots=[0.3105915033, 0.3105915033, 0.3105915033, 0.3105915033, 1, 1, 1, 1], degree=3))
            ThreePointArc((-13.4162854763, -0.8613894905), (-11.8071303692, -1.5501063766), (-10.4103203839, -2.6049205653))
            add(Edge.make_bspline(
                [(-9.4931438127, -3.0696215748), (-9.8012757449, -2.911618141), (-10.1102346708, -2.7551619236), (-10.4103203839, -2.6049205653)],
                knots=[0, 0, 0, 0, 0.1998469615, 0.1998469615, 0.1998469615, 0.1998469615], degree=3))
            add(Edge.make_bspline(
                [(-2.1025083612, -6.1942458992), (-3.6078737659, -5.9484422838), (-5.1525675452, -5.2953738791), (-9.4931438127, -3.0696215748)],
                knots=[0, 0, 0, 0, 1, 1, 1, 1], degree=3))
            add(Edge.make_bspline(
                [(3.1856187291, -5.9524701801), (2.2569598997, -6.2331244644), (-0.9628468896, -6.3803357286), (-2.1025083612, -6.1942458992)],
                knots=[0, 0, 0, 0, 1, 1, 1, 1], degree=3))
            add(Edge.make_bspline(
                [(9.616079388, -3.0105054109), (6.4728204682, -4.6277051467), (4.3392408562, -5.6038271467), (3.1856187291, -5.9524701801)],
                knots=[0, 0, 0, 0, 1, 1, 1, 1], degree=3))
            add(Edge.make_bspline(
                [(10.4068537547, -2.6082707732), (10.1467262743, -2.7391031612), (9.8808705361, -2.8742711894), (9.616079388, -3.0105054109)],
                knots=[0.8203862462, 0.8203862462, 0.8203862462, 0.8203862462, 1, 1, 1, 1], degree=3))
            ThreePointArc((10.4068537547, -2.6082707732), (11.8050454626, -1.5513161359), (13.4162854763, -0.8613894905))
            add(Edge.make_bspline(
                [(11.8125380167, -0.0888470497), (12.5033600683, -0.3894012805), (13.1075898138, -0.6826431402), (13.4162854763, -0.8613894905)],
                knots=[0, 0, 0, 0, 0.6894084967, 0.6894084967, 0.6894084967, 0.6894084967], degree=3))
            add(Edge.make_bspline(
                [(8.8499125987, 1.3474413985), (9.4773074649, 0.9934414286), (10.810488903, 0.3471112446), (11.8125380167, -0.0888470497)],
                knots=[0, 0, 0, 0, 1, 1, 1, 1], degree=3))
            add(Edge.make_bspline(
                [(4.9058528428, 3.04326985), (5.7246919264, 3.0341589804), (6.2956095953, 2.7886790239), (8.8499125987, 1.3474413985)],
                knots=[0, 0, 0, 0, 1, 1, 1, 1], degree=3))
            add(Edge.make_bspline(
                [(2.9944816054, 2.6944458734), (3.7453867324, 2.9284155523), (4.4052494247, 3.04884086), (4.9058528428, 3.04326985)],
                knots=[0, 0, 0, 0, 1, 1, 1, 1], degree=3))
            add(Edge.make_bspline(
                [(-2.9944816054, 2.6944458734), (-0.8245757458, 2.0183365255), (0.8245757458, 2.0183365255), (2.9944816054, 2.6944458734)],
                knots=[0, 0, 0, 0, 1, 1, 1, 1], degree=3))
            add(Edge.make_bspline(
                [(-4.9058528428, 3.04326985), (-4.4052494247, 3.0488383115), (-3.7453867324, 2.9284155523), (-2.9944816054, 2.6944458734)],
                knots=[0, 0, 0, 0, 1, 1, 1, 1], degree=3))
            add(Edge.make_bspline(
                [(-8.8499125987, 1.3474413985), (-6.2956095953, 2.7886790239), (-5.7246919264, 3.0341564319), (-4.9058528428, 3.04326985)],
                knots=[0, 0, 0, 0, 1, 1, 1, 1], degree=3))
            add(Edge.make_bspline(
                [(-11.8125380167, -0.0888470497), (-10.810488903, 0.3471112446), (-9.4773074649, 0.9934414286), (-8.8499125987, 1.3474413985)],
                knots=[0, 0, 0, 0, 1, 1, 1, 1], degree=3))
        make_face()
        with BuildLine():
            ThreePointArc((-10.4103203839, -2.6049205653), (-11.8071303692, -1.5501063766), (-13.4162854763, -0.8613894905))
            add(Edge.make_bspline(
                [(-13.6344481605, -1.0234578892), (-13.6344481605, -0.9992078468), (-13.5553586823, -0.9419180856), (-13.4162854763, -0.8613894905)],
                knots=[0, 0, 0, 0, 0.3105915033, 0.3105915033, 0.3105915033, 0.3105915033], degree=3))
            add(Edge.make_bspline(
                [(-12.9654682274, -1.3987709226), (-13.3334071906, -1.2704261668), (-13.6344481605, -1.1015348557), (-13.6344481605, -1.0234578892)],
                knots=[0, 0, 0, 0, 1, 1, 1, 1], degree=3))
            add(Edge.make_bspline(
                [(-10.4103203839, -2.6049205653), (-11.6118122322, -2.003379874), (-12.671060748, -1.5014673886), (-12.9654682274, -1.3987709226)],
                knots=[0.1998469615, 0.1998469615, 0.1998469615, 0.1998469615, 1, 1, 1, 1], degree=3))
        make_face()
        with BuildLine():
            ThreePointArc((22.6781787946, 7.8120026737), (15.4391787946, 15.0510026737), (8.2001787946, 7.8120026737))
            Line((8.2001787946, 7.8120026737), (15.4391787946, 7.8120026737))
            Line((15.4391787946, 7.8120026737), (15.4391787946, 0.5730026737))
            ThreePointArc((15.4391787946, 0.5730026737), (20.5579247836, 2.6932566847), (22.6781787946, 7.8120026737))
        make_face()
        with BuildLine():
            Line((15.4391787946, 7.8120026737), (8.2001787946, 7.8120026737))
            ThreePointArc((8.2001787946, 7.8120026737), (10.3204328056, 2.6932566847), (15.4391787946, 0.5730026737))
            Line((15.4391787946, 0.5730026737), (15.4391787946, 7.8120026737))
        make_face()
        with BuildLine():
            ThreePointArc((1.2698828628, -7.8120026737), (0, -7.699749373), (-1.2698828628, -7.8120026737))
            Line((-1.2698828628, -7.8120026737), (1.2698828628, -7.8120026737))
        make_face()
        with BuildLine():
            Line((1.2698828628, -7.8120026737), (-1.2698828628, -7.8120026737))
            ThreePointArc((-1.2698828628, -7.8120026737), (-4.648141508, -20.4883350802), (7.239, -14.938749373))
            ThreePointArc((7.239, -14.938749373), (5.5495857072, -10.290607865), (1.2698828628, -7.8120026737))
        make_face()
        with BuildLine():
            add(Edge.make_bspline(
                [(13.4162854763, -0.8613894905), (13.5553586823, -0.9419180856), (13.6344481605, -0.9992078468), (13.6344481605, -1.0234578892)],
                knots=[0.6894084967, 0.6894084967, 0.6894084967, 0.6894084967, 1, 1, 1, 1], degree=3))
            ThreePointArc((13.4162854763, -0.8613894905), (11.8050454626, -1.5513161359), (10.4068537547, -2.6082707732))
            add(Edge.make_bspline(
                [(12.9654682274, -1.39842815), (12.6636161626, -1.5035667524), (11.5949866381, -2.010693531), (10.4068537547, -2.6082707732)],
                knots=[0, 0, 0, 0, 0.8203862462, 0.8203862462, 0.8203862462, 0.8203862462], degree=3))
            add(Edge.make_bspline(
                [(13.6344481605, -1.0234578892), (13.6344481605, -1.1015348557), (13.3334071906, -1.2702719828), (12.9654682274, -1.39842815)],
                knots=[0, 0, 0, 0, 1, 1, 1, 1], degree=3))
        make_face()
        with Locations((-53.0695078206, 0)):
            Circle(F2_R)
        with Locations((49.2036237652, 0)):
            Circle(F2_R)
    extrude(amount=-F3_DEPTH, mode=Mode.SUBTRACT)


solid = f1.part
